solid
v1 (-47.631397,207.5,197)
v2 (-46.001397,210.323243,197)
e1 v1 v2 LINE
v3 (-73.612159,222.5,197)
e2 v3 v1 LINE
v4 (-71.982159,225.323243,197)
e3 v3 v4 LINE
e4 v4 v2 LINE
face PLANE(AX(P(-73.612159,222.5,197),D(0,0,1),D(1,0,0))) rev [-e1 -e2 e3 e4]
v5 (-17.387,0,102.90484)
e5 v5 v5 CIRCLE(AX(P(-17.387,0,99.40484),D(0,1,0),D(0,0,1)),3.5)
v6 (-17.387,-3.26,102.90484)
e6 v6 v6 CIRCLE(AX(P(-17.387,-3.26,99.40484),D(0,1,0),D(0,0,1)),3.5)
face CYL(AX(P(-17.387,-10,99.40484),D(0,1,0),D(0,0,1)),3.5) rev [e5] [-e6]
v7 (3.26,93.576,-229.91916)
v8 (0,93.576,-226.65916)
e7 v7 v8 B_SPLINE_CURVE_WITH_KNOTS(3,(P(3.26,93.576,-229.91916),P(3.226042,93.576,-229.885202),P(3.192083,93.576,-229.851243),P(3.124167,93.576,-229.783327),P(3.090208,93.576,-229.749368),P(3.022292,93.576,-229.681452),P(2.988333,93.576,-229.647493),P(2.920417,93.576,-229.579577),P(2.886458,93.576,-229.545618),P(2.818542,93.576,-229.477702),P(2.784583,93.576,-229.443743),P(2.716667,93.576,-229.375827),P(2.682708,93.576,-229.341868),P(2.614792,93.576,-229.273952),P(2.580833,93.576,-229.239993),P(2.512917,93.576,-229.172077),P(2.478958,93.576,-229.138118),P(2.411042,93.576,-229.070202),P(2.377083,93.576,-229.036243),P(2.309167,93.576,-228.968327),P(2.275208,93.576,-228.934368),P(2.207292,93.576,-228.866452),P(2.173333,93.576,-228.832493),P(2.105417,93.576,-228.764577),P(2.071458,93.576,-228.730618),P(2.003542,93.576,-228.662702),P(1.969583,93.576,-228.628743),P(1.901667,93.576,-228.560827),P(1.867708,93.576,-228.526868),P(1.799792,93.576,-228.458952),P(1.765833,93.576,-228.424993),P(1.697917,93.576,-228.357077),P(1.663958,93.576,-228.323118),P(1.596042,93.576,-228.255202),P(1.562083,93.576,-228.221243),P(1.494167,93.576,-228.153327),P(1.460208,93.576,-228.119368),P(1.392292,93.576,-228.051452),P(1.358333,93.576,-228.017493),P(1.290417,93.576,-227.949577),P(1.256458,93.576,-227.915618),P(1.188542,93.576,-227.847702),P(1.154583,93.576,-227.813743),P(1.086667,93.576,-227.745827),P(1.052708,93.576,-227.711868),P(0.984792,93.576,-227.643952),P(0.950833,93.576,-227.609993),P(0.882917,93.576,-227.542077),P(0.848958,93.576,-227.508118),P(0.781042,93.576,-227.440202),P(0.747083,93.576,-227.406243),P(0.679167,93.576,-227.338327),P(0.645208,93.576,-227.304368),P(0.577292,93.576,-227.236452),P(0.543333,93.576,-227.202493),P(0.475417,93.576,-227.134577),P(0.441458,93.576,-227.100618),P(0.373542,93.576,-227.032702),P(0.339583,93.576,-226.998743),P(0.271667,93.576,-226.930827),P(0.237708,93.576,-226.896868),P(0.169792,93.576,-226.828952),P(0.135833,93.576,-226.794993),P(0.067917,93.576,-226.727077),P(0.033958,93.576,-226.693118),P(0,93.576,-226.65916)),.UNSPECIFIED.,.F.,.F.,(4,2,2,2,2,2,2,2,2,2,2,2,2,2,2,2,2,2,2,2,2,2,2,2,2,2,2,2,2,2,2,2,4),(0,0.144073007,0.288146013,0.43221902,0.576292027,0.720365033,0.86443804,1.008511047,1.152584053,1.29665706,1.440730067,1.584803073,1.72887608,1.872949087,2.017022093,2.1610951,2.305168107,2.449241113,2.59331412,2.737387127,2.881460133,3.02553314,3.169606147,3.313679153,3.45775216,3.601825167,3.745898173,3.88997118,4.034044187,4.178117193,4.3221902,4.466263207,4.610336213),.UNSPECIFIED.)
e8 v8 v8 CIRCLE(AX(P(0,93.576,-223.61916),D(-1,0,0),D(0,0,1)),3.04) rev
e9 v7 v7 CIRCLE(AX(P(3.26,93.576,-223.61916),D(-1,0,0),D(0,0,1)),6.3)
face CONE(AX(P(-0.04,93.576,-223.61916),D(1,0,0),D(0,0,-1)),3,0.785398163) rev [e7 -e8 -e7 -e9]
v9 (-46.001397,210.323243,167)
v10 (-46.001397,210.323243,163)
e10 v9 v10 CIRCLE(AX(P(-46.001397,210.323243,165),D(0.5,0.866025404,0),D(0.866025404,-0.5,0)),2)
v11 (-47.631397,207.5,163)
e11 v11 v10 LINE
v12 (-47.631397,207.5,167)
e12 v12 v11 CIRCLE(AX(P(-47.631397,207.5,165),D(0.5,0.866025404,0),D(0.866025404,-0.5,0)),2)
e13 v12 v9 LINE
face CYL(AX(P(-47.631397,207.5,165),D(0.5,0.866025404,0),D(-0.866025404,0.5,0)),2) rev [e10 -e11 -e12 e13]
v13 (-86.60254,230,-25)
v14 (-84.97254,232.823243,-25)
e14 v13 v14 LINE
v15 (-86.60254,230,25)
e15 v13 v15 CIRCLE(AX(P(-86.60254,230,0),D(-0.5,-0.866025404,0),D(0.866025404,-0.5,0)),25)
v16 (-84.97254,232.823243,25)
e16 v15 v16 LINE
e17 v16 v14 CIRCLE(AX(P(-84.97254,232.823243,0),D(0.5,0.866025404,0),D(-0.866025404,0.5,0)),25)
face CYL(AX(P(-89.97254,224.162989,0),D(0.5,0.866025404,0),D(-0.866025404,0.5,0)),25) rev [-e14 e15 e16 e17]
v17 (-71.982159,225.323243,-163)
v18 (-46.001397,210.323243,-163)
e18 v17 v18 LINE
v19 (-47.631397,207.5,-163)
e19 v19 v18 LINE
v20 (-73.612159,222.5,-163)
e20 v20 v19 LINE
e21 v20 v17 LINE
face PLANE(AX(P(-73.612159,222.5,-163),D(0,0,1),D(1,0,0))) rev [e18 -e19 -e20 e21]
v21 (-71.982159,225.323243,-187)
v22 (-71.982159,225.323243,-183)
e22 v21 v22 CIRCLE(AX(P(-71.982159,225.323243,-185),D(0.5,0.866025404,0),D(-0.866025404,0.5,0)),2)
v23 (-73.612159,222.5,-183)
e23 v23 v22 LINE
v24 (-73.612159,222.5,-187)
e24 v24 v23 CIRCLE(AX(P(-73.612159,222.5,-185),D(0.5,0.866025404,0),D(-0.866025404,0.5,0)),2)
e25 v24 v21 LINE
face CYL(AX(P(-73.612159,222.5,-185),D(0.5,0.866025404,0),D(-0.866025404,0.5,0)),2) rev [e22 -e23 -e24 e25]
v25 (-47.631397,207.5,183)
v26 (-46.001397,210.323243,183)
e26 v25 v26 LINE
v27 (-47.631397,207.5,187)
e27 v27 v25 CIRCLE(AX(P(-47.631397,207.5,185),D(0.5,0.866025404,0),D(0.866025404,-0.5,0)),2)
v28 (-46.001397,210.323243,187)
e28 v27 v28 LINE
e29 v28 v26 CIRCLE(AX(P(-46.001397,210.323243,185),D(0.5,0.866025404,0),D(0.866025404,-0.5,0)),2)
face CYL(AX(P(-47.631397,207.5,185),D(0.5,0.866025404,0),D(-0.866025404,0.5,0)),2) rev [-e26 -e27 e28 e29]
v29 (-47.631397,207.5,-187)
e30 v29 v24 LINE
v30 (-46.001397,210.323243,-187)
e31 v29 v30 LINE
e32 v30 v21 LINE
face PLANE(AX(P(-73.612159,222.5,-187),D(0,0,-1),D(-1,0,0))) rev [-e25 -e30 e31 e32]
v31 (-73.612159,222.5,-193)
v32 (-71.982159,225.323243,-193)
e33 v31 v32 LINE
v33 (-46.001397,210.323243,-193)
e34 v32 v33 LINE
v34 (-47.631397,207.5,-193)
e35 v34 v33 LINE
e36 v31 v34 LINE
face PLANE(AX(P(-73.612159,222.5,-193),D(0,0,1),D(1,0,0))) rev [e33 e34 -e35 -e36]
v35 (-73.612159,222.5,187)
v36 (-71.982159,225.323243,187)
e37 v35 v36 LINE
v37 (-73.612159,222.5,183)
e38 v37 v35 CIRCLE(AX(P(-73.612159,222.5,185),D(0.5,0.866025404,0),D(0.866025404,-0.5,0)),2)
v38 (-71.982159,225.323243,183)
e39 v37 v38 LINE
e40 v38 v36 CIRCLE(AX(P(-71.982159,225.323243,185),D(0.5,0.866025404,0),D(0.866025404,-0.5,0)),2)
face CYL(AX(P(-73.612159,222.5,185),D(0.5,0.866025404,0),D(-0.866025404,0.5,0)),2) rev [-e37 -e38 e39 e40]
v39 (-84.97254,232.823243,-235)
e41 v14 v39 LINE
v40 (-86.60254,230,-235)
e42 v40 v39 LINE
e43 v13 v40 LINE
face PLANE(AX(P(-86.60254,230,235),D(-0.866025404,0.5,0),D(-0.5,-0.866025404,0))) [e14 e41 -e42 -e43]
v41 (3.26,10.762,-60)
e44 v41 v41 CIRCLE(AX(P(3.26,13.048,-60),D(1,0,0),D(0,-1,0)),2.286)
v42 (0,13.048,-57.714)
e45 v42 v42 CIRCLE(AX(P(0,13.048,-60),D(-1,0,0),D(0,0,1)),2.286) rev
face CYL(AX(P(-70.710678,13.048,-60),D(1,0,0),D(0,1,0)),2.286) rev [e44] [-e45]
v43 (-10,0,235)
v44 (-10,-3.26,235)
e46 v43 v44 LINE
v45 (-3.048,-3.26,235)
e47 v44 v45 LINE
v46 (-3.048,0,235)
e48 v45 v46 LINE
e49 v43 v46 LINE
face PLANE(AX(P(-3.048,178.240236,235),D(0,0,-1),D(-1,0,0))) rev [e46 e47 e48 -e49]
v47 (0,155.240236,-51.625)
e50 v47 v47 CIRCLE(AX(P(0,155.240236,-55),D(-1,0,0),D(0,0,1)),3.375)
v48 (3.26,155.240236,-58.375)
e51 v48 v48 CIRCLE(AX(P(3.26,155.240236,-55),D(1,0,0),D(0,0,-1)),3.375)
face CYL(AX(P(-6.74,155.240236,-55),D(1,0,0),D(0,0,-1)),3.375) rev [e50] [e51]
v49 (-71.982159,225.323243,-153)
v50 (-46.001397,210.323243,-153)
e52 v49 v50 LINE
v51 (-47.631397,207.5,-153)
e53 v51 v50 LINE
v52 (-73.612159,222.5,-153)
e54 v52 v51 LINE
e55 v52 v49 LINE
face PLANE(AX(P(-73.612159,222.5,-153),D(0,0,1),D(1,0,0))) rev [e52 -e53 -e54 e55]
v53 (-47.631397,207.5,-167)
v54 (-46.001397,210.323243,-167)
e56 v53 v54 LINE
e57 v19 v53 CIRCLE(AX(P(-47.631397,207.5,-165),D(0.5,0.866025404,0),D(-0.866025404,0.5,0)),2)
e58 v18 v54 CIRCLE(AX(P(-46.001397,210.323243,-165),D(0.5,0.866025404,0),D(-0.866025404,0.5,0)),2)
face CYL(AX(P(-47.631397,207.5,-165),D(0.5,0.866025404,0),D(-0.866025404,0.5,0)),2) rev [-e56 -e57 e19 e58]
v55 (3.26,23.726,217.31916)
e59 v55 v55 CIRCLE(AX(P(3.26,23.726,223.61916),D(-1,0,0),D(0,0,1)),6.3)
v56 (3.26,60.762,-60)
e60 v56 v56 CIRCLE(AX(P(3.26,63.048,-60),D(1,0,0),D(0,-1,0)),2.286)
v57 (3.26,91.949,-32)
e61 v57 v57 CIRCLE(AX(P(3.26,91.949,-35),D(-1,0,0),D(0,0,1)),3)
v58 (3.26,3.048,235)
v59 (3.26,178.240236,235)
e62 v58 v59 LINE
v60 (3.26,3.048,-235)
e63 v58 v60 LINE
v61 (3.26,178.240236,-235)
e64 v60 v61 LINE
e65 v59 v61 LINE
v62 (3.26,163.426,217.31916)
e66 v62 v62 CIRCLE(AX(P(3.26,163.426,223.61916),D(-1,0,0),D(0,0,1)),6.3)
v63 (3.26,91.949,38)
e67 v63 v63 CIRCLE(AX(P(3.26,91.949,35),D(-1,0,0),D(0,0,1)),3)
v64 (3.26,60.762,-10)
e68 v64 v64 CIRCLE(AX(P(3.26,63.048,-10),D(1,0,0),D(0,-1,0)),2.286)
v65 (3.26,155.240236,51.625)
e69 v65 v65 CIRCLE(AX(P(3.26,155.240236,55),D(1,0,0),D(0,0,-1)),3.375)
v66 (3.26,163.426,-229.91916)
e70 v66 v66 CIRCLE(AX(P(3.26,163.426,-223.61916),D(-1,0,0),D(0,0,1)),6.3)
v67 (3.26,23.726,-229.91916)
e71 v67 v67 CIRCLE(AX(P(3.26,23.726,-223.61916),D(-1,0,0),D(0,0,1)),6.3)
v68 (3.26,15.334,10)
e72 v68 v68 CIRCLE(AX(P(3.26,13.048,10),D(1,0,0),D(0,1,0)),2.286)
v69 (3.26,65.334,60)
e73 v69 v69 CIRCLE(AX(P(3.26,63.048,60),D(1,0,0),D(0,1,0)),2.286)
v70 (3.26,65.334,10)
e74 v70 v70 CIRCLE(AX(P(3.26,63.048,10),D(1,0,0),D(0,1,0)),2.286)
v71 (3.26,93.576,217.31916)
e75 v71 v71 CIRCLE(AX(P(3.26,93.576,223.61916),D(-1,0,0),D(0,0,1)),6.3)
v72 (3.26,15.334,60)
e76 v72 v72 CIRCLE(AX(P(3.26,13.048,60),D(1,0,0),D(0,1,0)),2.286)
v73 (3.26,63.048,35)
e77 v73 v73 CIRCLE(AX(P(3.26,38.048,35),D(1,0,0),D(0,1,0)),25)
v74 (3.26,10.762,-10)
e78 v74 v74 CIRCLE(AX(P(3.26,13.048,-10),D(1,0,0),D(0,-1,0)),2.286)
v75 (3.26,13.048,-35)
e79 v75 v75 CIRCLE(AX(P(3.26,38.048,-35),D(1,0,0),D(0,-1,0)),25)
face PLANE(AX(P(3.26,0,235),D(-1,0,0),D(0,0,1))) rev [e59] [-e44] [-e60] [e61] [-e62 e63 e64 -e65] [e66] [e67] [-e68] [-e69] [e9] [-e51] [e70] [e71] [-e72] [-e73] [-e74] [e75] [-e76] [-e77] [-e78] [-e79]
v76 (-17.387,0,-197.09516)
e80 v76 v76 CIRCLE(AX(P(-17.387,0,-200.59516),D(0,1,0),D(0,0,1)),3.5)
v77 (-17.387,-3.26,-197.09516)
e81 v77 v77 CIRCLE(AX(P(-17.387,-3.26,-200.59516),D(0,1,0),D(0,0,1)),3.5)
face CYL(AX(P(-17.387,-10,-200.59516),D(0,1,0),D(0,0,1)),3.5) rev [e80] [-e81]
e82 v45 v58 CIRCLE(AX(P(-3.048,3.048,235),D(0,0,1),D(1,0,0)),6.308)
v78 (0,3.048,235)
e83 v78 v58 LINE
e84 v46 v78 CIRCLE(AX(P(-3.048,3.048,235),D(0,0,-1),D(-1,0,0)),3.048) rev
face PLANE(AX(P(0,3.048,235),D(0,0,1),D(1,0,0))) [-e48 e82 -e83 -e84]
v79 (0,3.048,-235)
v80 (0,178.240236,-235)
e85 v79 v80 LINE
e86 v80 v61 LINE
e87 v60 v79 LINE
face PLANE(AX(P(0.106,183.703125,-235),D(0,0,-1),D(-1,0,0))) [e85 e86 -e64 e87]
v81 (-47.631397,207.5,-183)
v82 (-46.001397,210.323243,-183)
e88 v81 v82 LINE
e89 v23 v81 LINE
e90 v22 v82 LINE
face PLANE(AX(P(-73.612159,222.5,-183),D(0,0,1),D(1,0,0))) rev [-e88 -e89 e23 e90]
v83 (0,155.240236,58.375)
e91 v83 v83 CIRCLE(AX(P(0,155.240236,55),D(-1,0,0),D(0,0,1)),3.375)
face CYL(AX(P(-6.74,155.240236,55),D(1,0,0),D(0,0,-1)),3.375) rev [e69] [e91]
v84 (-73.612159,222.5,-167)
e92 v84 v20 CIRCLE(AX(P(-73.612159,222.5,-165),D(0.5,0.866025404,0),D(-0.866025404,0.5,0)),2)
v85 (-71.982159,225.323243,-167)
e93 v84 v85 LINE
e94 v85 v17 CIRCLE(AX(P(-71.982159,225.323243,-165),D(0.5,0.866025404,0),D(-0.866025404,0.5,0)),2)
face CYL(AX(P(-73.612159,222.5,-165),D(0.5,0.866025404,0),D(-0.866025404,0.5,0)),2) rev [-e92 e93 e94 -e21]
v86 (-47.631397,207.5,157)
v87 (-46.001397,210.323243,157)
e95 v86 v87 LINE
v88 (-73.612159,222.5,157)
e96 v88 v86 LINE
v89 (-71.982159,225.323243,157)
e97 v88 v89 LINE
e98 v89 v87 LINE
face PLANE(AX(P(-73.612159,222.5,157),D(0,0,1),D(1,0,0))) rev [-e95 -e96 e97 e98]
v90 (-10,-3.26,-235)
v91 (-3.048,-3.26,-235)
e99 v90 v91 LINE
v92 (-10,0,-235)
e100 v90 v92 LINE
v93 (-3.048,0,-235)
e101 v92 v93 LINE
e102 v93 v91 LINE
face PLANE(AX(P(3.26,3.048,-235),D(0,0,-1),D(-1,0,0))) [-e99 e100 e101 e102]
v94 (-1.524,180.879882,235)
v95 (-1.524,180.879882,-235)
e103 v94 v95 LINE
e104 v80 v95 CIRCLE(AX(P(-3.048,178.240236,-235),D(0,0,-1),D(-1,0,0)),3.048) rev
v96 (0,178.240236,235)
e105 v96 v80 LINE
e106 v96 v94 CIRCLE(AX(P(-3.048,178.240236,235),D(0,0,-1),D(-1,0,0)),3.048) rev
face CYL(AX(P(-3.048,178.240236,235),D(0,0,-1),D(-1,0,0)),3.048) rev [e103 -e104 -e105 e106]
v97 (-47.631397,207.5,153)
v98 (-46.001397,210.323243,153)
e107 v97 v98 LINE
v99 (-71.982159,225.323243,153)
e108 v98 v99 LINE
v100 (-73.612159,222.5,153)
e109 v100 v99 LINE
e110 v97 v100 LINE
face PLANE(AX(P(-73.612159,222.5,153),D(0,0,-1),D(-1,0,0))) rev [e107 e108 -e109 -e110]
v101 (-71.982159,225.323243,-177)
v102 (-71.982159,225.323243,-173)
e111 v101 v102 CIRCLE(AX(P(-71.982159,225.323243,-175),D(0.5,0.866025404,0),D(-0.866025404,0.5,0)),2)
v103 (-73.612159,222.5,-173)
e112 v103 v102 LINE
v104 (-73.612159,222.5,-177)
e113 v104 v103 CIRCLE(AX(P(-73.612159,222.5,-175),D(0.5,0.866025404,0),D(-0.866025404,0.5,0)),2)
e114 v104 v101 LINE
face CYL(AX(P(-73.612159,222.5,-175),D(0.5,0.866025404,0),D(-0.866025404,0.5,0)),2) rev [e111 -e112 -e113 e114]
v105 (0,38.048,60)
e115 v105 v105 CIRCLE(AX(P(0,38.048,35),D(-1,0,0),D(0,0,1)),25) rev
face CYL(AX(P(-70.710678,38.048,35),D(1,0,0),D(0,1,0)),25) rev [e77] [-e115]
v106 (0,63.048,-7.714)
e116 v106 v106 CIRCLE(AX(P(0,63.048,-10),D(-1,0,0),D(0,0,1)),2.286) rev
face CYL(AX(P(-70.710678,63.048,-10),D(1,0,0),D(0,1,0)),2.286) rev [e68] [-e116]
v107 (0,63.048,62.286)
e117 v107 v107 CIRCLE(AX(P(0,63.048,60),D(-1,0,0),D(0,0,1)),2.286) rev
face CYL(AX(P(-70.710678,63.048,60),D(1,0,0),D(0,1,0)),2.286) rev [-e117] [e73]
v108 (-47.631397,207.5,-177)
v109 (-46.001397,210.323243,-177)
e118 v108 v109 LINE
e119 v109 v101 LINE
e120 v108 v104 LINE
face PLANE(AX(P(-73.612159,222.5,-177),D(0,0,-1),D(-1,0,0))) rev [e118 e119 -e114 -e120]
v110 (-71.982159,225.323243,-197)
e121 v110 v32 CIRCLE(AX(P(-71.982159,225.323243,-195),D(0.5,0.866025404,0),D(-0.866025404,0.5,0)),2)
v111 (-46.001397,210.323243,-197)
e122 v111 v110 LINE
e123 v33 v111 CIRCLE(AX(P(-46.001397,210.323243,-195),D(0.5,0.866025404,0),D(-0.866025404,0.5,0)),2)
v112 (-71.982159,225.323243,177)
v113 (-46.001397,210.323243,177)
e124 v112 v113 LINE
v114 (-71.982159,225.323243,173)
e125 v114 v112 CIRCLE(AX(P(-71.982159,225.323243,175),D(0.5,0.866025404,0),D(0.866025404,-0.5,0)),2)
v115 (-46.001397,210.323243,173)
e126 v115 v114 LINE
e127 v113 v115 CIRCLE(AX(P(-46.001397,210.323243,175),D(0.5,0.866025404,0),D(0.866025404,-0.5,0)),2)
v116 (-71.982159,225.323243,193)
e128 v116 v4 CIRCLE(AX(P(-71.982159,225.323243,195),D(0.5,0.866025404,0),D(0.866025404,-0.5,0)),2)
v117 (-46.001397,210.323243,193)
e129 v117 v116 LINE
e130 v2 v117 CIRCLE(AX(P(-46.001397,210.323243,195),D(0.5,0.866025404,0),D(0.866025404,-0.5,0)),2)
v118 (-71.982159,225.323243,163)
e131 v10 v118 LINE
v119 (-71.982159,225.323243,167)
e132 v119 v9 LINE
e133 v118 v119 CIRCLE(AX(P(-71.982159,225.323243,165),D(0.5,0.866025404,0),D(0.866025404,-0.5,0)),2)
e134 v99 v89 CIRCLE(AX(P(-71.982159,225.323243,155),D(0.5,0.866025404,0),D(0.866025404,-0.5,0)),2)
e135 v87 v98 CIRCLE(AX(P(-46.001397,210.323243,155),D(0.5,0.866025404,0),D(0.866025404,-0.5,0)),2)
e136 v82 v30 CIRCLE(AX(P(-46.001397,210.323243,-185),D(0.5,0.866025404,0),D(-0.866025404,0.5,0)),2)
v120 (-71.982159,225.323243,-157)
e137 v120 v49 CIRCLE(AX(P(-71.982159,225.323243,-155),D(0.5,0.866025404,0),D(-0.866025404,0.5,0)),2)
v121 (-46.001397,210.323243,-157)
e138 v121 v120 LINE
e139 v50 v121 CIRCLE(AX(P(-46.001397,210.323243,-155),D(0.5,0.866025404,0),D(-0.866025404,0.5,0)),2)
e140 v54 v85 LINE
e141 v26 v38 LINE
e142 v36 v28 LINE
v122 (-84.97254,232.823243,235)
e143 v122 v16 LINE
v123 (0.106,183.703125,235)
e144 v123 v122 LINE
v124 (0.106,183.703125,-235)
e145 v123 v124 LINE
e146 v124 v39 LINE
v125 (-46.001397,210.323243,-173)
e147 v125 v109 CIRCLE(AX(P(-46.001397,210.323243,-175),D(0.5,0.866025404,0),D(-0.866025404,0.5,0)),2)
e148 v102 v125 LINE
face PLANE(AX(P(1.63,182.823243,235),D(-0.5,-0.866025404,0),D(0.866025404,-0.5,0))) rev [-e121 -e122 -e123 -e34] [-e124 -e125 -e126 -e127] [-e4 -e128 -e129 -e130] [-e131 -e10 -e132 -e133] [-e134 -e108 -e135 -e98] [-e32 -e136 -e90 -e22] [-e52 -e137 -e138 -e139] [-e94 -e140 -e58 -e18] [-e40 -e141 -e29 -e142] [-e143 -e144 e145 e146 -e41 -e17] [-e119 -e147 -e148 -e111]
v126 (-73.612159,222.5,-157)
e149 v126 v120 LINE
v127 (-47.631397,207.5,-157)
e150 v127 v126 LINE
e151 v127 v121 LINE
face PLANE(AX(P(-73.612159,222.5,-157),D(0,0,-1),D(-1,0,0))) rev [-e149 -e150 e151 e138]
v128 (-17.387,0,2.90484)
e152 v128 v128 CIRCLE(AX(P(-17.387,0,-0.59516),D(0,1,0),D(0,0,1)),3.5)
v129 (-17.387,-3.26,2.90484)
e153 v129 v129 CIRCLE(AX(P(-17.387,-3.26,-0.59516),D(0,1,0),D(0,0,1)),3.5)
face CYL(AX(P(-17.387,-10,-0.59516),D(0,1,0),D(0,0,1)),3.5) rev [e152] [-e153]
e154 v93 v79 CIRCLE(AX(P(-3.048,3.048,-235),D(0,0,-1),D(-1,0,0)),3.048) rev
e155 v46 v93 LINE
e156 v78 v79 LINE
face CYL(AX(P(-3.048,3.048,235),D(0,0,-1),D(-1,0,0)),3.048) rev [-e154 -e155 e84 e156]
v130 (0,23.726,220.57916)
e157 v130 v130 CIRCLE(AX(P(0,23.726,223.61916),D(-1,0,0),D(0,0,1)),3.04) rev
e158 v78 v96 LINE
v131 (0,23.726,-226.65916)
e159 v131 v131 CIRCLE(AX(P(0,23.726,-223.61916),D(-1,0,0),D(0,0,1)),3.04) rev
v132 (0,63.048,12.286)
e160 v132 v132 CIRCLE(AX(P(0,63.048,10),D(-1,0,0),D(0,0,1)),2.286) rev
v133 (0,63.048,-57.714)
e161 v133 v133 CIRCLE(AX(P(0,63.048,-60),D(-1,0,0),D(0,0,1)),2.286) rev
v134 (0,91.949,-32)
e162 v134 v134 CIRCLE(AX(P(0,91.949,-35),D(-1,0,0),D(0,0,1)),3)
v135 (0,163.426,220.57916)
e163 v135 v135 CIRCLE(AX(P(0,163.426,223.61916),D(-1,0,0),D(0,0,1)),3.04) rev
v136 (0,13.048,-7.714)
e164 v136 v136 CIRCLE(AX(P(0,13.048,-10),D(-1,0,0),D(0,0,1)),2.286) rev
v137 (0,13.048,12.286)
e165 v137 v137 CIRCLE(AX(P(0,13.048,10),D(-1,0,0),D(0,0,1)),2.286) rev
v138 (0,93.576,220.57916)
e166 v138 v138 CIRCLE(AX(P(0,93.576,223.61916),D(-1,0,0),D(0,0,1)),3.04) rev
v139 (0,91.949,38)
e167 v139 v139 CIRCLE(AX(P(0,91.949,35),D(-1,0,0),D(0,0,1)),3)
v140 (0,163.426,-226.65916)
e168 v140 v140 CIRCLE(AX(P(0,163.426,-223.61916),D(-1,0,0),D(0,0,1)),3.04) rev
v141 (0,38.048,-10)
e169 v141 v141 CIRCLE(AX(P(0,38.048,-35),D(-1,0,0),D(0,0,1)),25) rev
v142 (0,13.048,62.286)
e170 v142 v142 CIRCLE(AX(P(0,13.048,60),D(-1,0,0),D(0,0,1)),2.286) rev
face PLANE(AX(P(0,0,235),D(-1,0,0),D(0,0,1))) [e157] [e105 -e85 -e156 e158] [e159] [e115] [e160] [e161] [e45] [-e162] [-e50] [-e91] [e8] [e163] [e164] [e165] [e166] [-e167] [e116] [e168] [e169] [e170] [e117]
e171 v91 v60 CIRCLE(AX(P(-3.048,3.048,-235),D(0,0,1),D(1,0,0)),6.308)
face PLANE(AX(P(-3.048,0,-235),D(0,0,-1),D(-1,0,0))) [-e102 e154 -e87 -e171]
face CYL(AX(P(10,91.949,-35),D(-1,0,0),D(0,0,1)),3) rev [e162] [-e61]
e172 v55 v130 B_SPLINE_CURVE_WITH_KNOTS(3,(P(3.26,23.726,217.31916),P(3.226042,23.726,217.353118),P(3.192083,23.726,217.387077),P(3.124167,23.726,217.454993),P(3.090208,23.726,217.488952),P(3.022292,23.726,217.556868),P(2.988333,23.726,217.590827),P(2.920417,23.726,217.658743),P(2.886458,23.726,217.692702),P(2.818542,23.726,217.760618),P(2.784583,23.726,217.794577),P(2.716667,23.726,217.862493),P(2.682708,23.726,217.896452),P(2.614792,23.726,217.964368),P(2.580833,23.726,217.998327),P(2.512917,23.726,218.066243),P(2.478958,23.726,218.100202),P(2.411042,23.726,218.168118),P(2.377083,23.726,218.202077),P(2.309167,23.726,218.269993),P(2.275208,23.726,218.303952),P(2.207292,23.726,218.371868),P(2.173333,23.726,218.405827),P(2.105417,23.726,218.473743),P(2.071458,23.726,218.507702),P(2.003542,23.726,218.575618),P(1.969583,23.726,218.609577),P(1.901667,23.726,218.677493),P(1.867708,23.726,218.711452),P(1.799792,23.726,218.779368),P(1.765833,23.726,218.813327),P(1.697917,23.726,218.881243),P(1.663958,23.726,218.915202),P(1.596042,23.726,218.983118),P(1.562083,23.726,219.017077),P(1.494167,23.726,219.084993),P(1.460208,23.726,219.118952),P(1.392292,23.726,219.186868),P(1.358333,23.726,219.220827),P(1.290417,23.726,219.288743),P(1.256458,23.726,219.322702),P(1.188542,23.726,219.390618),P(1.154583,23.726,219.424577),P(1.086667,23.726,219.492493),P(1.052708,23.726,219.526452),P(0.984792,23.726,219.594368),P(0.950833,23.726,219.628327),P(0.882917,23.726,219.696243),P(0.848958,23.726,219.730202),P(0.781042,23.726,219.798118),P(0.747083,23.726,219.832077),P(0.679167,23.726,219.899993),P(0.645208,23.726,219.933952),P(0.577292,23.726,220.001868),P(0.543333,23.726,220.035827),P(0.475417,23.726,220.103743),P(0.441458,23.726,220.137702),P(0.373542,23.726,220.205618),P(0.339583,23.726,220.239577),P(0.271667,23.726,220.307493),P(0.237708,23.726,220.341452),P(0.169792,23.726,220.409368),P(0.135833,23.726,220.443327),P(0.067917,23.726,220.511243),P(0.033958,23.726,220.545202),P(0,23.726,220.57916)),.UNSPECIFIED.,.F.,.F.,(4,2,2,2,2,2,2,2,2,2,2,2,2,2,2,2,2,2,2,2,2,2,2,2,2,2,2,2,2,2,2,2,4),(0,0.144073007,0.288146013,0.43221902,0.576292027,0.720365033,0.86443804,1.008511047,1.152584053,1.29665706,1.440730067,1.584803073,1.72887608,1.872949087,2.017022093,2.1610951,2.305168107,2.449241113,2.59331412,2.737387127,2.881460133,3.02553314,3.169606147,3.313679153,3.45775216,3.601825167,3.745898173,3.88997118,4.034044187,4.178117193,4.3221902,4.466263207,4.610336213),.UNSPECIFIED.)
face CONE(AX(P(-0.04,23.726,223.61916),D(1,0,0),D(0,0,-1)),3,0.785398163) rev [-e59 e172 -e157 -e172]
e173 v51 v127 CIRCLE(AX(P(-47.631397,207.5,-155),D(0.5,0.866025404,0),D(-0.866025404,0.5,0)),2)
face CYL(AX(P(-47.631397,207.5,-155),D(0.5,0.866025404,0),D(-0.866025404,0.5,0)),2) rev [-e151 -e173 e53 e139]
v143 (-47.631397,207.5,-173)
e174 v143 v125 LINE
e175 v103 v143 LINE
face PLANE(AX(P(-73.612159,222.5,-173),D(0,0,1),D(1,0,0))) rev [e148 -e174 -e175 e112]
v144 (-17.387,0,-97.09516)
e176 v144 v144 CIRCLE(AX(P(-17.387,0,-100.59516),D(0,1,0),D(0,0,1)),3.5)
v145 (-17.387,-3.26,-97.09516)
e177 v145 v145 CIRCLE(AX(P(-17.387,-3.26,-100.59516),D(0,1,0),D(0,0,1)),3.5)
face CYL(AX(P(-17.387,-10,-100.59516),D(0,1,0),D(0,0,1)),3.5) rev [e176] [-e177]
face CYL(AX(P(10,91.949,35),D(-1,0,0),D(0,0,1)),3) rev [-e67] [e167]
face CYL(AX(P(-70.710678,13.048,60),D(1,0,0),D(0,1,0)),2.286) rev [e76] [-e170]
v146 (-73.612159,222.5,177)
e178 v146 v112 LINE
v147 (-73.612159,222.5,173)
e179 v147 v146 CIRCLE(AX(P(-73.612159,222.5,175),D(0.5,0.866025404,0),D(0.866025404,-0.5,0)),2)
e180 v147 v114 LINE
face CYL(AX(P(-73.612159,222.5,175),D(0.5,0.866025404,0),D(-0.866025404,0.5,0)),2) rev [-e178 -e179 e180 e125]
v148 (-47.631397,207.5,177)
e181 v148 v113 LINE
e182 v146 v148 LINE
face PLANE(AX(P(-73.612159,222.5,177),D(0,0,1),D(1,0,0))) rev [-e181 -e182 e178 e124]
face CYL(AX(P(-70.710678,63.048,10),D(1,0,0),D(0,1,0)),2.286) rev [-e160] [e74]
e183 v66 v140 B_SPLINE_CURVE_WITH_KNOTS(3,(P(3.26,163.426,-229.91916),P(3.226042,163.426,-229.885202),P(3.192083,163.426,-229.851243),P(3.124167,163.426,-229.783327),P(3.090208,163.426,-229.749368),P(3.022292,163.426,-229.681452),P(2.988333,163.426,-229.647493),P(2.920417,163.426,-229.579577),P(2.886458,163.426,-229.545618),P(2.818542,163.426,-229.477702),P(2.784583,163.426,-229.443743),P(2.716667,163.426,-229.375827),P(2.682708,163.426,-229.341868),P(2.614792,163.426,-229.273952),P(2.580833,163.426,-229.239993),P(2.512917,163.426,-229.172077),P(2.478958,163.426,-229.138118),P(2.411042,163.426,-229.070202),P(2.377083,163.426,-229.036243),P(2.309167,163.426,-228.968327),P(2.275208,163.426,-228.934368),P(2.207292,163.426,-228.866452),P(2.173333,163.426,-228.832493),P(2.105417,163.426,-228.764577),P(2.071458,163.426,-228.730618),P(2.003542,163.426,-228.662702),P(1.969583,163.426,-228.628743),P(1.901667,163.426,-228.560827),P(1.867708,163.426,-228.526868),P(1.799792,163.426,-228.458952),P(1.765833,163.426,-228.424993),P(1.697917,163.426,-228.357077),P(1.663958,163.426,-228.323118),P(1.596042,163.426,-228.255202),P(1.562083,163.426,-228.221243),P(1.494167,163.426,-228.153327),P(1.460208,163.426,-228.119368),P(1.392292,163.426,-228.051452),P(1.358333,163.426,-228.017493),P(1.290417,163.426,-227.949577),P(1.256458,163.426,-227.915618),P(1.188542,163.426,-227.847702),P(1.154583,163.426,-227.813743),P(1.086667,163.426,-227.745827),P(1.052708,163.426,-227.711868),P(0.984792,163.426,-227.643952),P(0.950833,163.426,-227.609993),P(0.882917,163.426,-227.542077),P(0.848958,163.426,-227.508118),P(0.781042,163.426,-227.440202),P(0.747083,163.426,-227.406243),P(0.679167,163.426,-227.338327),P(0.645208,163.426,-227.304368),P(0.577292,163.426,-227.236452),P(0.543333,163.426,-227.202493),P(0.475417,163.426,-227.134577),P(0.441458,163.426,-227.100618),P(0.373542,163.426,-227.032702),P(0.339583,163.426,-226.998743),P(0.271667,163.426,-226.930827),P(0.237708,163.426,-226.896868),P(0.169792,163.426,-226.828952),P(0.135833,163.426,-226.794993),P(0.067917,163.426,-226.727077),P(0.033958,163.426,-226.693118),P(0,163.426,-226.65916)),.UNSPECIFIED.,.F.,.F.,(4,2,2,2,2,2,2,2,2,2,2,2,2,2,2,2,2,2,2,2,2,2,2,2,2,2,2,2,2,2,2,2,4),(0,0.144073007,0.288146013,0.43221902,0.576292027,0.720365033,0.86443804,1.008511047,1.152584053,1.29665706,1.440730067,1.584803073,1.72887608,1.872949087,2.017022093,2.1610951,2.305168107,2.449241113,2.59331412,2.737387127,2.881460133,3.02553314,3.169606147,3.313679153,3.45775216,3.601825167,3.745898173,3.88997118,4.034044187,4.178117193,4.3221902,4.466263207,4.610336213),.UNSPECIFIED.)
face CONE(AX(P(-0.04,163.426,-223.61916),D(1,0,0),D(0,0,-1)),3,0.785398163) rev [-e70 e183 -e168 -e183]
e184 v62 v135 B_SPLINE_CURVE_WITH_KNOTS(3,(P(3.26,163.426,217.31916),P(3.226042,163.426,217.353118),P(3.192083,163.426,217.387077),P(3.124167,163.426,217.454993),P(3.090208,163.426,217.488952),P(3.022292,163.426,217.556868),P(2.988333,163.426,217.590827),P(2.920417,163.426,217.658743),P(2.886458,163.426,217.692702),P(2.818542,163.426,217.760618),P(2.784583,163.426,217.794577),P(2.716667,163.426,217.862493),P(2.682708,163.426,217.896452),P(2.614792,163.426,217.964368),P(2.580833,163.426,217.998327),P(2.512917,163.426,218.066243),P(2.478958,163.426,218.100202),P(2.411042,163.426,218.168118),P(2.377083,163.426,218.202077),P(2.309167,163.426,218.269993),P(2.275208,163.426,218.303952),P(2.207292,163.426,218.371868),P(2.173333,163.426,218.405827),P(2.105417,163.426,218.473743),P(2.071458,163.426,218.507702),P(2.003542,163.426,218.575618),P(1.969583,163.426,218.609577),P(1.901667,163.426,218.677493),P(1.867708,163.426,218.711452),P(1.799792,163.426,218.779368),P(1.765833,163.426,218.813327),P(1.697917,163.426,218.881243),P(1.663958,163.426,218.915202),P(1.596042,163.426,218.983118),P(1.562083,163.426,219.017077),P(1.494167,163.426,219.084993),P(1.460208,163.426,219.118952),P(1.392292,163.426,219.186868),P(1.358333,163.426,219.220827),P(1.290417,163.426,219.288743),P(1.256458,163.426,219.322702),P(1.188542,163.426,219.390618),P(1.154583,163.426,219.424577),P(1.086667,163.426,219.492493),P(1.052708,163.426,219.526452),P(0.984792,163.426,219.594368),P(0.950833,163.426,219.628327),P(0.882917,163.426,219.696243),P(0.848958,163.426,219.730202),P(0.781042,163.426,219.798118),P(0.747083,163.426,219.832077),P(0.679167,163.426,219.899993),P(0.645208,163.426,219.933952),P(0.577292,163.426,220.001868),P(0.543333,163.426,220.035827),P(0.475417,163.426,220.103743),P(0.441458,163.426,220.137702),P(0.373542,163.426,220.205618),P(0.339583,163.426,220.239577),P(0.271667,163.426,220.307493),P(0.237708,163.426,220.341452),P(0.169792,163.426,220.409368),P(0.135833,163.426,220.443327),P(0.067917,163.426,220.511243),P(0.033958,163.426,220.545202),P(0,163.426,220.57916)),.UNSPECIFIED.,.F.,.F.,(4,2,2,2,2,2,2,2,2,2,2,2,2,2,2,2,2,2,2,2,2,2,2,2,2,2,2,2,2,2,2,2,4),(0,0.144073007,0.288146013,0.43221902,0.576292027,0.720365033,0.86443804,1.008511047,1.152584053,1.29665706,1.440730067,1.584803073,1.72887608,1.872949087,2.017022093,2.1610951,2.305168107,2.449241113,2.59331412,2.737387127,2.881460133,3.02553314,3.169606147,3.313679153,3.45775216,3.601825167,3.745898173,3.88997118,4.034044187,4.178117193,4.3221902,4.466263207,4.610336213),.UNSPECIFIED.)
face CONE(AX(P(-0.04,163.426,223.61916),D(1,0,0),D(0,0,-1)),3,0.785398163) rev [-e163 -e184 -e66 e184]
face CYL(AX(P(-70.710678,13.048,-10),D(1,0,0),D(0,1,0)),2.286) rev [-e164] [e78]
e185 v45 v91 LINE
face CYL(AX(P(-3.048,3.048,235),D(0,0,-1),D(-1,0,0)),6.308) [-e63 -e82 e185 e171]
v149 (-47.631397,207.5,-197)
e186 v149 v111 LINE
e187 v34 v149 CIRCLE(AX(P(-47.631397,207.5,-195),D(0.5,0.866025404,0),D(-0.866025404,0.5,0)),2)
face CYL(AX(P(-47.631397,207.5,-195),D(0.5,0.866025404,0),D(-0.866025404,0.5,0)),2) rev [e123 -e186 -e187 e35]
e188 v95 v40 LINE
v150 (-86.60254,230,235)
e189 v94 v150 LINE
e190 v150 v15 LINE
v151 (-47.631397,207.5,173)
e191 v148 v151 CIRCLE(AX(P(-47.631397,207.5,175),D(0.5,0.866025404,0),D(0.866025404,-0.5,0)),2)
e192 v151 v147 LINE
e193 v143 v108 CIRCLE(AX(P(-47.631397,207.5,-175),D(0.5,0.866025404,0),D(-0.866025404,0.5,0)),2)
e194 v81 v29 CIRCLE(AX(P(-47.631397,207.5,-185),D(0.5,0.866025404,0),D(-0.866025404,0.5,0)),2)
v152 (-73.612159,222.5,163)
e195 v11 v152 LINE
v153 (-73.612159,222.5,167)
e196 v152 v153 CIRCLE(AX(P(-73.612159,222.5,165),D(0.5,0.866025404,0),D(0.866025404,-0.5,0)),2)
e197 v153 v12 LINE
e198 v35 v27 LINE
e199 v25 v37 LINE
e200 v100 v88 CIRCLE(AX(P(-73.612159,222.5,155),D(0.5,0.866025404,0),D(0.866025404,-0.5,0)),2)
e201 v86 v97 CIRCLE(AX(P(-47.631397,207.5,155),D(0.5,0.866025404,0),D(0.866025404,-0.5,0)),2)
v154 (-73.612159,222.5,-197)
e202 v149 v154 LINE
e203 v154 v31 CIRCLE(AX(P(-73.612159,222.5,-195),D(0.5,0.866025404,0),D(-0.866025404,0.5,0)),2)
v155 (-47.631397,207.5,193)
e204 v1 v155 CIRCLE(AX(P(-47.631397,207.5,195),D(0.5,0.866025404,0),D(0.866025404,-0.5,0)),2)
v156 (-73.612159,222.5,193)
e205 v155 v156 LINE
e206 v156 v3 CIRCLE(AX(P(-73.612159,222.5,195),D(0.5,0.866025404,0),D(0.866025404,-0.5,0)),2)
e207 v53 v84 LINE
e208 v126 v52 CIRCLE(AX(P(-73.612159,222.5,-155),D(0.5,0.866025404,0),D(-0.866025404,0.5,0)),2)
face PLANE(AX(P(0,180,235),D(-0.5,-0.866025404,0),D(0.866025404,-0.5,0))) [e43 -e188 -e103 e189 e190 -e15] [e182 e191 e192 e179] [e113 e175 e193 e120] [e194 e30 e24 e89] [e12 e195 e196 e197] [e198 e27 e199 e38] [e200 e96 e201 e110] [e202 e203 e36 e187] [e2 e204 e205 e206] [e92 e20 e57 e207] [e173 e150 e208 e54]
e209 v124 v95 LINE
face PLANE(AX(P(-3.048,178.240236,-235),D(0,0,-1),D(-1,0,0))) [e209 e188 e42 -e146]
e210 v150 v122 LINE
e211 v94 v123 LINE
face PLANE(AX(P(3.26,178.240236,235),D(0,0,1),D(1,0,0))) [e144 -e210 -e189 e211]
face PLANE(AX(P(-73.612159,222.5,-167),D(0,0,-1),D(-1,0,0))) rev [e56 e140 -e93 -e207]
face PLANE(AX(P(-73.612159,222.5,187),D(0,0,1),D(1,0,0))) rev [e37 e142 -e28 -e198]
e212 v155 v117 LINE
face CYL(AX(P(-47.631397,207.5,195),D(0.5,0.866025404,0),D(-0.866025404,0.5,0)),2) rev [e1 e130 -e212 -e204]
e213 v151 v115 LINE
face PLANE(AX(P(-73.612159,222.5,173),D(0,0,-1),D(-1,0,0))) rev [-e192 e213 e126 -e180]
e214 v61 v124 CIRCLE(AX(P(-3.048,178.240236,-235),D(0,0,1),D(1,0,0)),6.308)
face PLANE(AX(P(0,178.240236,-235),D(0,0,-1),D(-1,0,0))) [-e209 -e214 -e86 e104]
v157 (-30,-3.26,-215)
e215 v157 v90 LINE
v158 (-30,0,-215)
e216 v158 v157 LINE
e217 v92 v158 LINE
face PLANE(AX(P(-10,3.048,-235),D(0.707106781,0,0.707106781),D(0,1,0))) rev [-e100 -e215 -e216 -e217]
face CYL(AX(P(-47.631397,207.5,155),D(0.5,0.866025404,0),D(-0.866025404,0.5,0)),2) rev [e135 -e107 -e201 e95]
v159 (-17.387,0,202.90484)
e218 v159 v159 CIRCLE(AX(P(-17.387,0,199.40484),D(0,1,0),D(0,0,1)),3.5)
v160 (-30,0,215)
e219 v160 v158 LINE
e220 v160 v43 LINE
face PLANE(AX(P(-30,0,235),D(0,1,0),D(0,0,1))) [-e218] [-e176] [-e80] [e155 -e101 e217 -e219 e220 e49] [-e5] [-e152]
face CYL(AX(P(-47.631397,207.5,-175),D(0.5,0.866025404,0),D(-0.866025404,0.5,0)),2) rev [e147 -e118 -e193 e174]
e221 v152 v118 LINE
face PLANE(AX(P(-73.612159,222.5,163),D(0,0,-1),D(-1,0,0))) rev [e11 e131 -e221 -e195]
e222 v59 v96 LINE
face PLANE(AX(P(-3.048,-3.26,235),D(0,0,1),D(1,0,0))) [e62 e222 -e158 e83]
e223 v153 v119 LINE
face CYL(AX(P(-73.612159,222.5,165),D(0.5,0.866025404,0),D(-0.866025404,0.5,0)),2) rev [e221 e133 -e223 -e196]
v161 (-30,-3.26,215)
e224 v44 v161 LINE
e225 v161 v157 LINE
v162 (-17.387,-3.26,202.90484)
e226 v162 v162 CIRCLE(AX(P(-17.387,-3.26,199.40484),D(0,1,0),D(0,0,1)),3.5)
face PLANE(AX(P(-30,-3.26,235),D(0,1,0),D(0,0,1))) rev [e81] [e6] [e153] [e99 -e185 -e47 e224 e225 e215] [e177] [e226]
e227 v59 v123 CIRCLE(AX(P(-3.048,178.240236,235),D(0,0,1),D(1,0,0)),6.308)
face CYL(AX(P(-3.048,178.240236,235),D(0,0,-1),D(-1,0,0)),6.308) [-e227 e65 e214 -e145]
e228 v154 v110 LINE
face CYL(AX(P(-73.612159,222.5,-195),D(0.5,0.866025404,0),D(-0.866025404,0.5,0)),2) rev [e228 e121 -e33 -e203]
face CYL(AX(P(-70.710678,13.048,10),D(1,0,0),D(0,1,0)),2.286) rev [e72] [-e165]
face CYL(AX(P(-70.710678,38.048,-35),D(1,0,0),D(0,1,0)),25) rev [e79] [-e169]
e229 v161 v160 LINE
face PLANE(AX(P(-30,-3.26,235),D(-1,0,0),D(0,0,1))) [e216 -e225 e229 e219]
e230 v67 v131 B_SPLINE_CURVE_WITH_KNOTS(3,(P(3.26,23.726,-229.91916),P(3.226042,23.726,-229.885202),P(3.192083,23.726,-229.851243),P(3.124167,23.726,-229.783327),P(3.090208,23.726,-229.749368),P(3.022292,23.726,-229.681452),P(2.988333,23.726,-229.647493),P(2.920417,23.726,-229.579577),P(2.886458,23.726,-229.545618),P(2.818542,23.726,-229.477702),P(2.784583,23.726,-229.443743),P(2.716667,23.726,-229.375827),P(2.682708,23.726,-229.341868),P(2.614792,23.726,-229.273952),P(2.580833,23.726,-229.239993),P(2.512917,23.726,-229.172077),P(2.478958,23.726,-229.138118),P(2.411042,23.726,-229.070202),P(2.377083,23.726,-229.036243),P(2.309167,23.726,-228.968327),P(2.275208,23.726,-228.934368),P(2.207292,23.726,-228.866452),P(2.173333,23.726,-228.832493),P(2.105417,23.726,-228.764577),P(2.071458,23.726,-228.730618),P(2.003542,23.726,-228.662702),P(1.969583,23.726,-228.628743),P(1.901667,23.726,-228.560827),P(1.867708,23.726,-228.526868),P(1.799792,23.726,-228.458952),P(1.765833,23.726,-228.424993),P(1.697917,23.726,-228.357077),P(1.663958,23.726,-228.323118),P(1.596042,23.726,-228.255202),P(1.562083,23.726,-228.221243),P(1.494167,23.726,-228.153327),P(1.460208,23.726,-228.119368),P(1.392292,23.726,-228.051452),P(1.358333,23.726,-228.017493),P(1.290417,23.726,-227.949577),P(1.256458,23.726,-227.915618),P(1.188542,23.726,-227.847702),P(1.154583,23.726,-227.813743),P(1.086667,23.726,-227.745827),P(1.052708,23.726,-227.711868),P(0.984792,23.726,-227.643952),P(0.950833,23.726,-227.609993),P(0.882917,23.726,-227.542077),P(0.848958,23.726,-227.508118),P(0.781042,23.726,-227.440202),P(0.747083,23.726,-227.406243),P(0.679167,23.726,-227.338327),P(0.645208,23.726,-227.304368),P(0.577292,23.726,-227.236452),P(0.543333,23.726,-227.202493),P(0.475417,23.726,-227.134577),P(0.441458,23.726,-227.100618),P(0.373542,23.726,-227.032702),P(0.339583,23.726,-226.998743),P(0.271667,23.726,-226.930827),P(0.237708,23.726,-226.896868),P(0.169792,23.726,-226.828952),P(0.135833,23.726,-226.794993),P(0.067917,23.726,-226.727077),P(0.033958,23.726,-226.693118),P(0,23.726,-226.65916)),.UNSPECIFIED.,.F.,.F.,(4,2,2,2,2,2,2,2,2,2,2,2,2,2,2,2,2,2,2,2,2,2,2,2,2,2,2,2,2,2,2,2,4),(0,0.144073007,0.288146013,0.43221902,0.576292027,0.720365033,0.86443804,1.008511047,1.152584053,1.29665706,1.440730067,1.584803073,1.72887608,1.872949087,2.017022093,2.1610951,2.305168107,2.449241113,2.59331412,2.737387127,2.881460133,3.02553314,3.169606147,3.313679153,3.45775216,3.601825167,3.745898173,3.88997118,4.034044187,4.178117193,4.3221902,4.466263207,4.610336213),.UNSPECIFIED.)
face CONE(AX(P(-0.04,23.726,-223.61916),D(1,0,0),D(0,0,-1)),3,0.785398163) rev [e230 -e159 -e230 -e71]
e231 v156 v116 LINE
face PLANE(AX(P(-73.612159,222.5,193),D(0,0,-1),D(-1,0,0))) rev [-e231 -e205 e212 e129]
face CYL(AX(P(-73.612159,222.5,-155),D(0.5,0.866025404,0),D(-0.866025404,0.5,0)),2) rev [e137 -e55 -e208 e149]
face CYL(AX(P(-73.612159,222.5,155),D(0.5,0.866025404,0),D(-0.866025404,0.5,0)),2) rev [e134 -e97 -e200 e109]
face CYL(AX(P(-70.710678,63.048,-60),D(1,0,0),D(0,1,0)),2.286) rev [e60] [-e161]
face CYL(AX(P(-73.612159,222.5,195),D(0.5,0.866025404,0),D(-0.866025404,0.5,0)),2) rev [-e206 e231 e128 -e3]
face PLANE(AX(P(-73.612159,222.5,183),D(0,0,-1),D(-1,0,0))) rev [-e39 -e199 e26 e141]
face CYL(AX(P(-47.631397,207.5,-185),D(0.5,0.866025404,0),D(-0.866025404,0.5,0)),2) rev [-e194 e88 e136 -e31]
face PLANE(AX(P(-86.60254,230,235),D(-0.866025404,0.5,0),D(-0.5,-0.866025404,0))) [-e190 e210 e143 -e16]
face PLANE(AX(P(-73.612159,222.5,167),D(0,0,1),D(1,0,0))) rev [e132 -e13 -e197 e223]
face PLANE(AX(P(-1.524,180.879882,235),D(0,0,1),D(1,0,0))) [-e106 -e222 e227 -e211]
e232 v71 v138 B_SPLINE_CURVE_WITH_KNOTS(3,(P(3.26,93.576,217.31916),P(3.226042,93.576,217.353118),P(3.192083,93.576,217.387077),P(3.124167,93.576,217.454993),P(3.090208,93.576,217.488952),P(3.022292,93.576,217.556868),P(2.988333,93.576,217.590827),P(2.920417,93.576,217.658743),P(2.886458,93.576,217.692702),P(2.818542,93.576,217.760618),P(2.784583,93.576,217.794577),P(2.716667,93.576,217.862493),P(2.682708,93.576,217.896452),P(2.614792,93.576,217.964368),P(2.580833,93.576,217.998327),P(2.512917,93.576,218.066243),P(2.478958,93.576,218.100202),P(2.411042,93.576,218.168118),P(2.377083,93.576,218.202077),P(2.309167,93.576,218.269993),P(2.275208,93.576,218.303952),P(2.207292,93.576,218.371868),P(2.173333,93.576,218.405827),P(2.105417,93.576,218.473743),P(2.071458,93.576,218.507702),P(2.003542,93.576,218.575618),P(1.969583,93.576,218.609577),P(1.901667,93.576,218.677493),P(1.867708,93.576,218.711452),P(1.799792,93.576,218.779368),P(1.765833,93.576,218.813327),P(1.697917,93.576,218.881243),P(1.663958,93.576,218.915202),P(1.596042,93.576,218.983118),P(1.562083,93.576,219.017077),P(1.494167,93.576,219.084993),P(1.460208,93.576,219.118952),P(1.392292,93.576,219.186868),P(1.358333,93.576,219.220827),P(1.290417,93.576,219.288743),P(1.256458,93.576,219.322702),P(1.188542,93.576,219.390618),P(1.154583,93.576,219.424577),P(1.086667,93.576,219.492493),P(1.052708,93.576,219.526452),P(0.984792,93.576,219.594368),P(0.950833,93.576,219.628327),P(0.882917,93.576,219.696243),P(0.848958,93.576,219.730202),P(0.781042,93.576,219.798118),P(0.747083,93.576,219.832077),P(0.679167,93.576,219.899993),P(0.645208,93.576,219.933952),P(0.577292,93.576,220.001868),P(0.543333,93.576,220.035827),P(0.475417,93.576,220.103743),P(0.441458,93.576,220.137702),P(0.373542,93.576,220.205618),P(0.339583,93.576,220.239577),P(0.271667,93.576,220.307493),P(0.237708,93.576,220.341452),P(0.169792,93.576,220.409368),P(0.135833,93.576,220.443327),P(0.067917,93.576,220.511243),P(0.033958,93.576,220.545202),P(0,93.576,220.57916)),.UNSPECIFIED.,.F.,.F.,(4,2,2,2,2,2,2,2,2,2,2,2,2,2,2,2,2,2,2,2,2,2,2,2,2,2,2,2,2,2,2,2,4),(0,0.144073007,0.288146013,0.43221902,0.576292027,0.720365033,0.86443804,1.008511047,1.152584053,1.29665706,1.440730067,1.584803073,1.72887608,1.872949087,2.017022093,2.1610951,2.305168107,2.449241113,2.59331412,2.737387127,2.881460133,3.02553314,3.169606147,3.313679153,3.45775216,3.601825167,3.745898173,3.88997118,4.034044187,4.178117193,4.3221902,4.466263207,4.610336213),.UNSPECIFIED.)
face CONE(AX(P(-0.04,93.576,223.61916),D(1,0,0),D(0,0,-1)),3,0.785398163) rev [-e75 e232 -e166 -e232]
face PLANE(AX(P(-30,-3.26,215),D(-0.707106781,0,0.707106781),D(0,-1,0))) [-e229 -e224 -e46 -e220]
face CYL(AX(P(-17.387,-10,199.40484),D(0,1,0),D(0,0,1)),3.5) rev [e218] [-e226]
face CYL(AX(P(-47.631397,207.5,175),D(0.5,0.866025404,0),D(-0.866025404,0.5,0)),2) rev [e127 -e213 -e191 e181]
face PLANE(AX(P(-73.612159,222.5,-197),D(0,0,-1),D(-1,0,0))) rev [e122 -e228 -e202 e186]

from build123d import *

# Parameters (mm, degrees)
BASE_FLANGE1_DEPTH = 235
SKETCH6_R          = 3.5
CUT_EXTRUDE1_DEPTH = 10
CHAMFER1_SIZE      = 20
SKETCH8_R          = 3
CUT_EXTRUDE3_DEPTH = 3.26
SKETCH11_R         = 2.286
SKETCH11_R_2       = 25
CUT_EXTRUDE5_DEPTH = 3.26
SKETCH12_R         = 3
CUT_EXTRUDE6_DEPTH = 10
CUT_EXTRUDE7_DEPTH = 10
CUT_EXTRUDE8_DEPTH = 10
CHAMFER2_SIZE      = 3.3
SKETCH15_R         = 3.375
CUT_EXTRUDE9_DEPTH = 10


# Sheet-metal steps are written as plain solids
with BuildPart() as part:
    # Sketch1 → Base-Flange1 (new, symmetric)
    with BuildSketch(Plane.XY):
        with BuildLine():
            Line((-30, 0), (-3.048, 0))
            ThreePointArc((-3.048, 0), (-0.892738531, 0.892738531), (0, 3.048))
            Line((0, 3.048), (0, 178.24023638))
            ThreePointArc((0, 178.24023638), (-0.408354569, 179.76423638), (-1.524, 180.87988181))
            Line((-1.524, 180.87988181), (-86.602540378, 230))
            Line((-86.602540378, 230), (-84.972540378, 232.823242816))
            Line((-84.972540378, 232.823242816), (0.106, 183.703124627))
            ThreePointArc((0.106, 183.703124627), (2.414888247, 181.39423638), (3.26, 178.24023638))
            Line((3.26, 178.24023638), (3.26, 3.048))
            ThreePointArc((3.26, 3.048), (1.412429576, -1.412429576), (-3.048, -3.26))
            Line((-3.048, -3.26), (-30, -3.26))
            Line((-30, -3.26), (-30, 0))
        make_face()
    extrude(amount=BASE_FLANGE1_DEPTH, both=True)

    # Sketch6 → Cut-Extrude1 (cut)
    with BuildSketch(Plane(origin=(0, 0, 0), x_dir=(1, 0, 0), z_dir=(0, 1, 0))):
        with Locations(Location((-17.387, 0.59516, 0), (0, 0, 270))):
            Circle(SKETCH6_R)
        with Locations(Location((-17.387, -199.40484, 0), (0, 0, 270))):
            Circle(SKETCH6_R)
        with Locations(Location((-17.387, -99.40484, 0), (0, 0, 270))):
            Circle(SKETCH6_R)
        with Locations(Location((-17.387, 200.59516, 0), (0, 0, 270))):
            Circle(SKETCH6_R)
        with Locations(Location((-17.387, 100.59516, 0), (0, 0, 270))):
            Circle(SKETCH6_R)
    extrude(amount=-CUT_EXTRUDE1_DEPTH, mode=Mode.SUBTRACT)

    # Chamfer1
    chamfer1_edges = [part.edges().sort_by_distance(p)[0] for p in [
        (-30, -1.63, -235),
        (-30, -1.63, 235),
    ]]
    chamfer(chamfer1_edges, length=CHAMFER1_SIZE)

    # Sketch8 → Cut-Extrude3 (cut)
    with BuildSketch(Plane(origin=(3.26, 0, 0), x_dir=(0, 0, -1), z_dir=(1, 0, 0))):
        with Locations((-223.61916, 163.426)):
            Circle(SKETCH8_R)
        with Locations((-223.61916, 93.576)):
            Circle(SKETCH8_R)
        with Locations((-223.61916, 23.726)):
            Circle(SKETCH8_R)
        with Locations(Location((223.61916, 23.726, 0), (0, 0, 180))):
            Circle(SKETCH8_R)
        with Locations(Location((223.61916, 93.576, 0), (0, 0, 180))):
            Circle(SKETCH8_R)
        with Locations(Location((223.61916, 163.426, 0), (0, 0, 180))):
            Circle(SKETCH8_R)
    extrude(amount=-CUT_EXTRUDE3_DEPTH, mode=Mode.SUBTRACT)

    # Sketch11 → Cut-Extrude5 (cut)
    with BuildSketch(Plane(origin=(3.26, 0, 0), x_dir=(0, 0, -1), z_dir=(1, 0, 0))):
        with Locations(Location((-60, 63.048, 0), (0, 0, 90))):
            Circle(SKETCH11_R)
        with Locations(Location((-10, 63.048, 0), (0, 0, 90))):
            Circle(SKETCH11_R)
        with Locations(Location((-10, 13.048, 0), (0, 0, 90))):
            Circle(SKETCH11_R)
        with Locations(Location((-60, 13.048, 0), (0, 0, 90))):
            Circle(SKETCH11_R)
        with Locations(Location((-35, 38.048, 0), (0, 0, 90))):
            Circle(SKETCH11_R_2)
        with Locations(Location((35, 38.048, 0), (0, 0, 180))):
            Circle(SKETCH11_R_2)
        with Locations(Location((60, 13.048, 0), (0, 0, 180))):
            Circle(SKETCH11_R)
        with Locations(Location((10, 13.048, 0), (0, 0, 180))):
            Circle(SKETCH11_R)
        with Locations(Location((10, 63.048, 0), (0, 0, 180))):
            Circle(SKETCH11_R)
        with Locations(Location((60, 63.048, 0), (0, 0, 180))):
            Circle(SKETCH11_R)
    extrude(amount=-CUT_EXTRUDE5_DEPTH, mode=Mode.SUBTRACT)

    # Sketch12 → Cut-Extrude6 (cut)
    with BuildSketch(Plane.ZY):
        with Locations((35, 91.949)):
            Circle(SKETCH12_R)
        with Locations((-35, 91.949)):
            Circle(SKETCH12_R)
    extrude(amount=-CUT_EXTRUDE6_DEPTH, mode=Mode.SUBTRACT)

    # Sketch13 → Cut-Extrude7 (cut)
    with BuildSketch(Plane(origin=(79.572286341, 137.823242816, 0), x_dir=(0.8660254037844399, -0.4999999999999977, 0), z_dir=(0.4999999999999977, 0.8660254037844399, 0))):
        with BuildLine():
            Line((-175, 197), (-145, 197))
            ThreePointArc((-145, 197), (-143, 195), (-145, 193))
            Line((-145, 193), (-175, 193))
            ThreePointArc((-175, 193), (-177, 195), (-175, 197))
        make_face()
        with BuildLine():
            Line((-175, 187), (-145, 187))
            ThreePointArc((-145, 187), (-143, 185), (-145, 183))
            Line((-145, 183), (-175, 183))
            ThreePointArc((-175, 183), (-177, 185), (-175, 187))
        make_face()
        with BuildLine():
            Line((-175, 177), (-145, 177))
            ThreePointArc((-145, 177), (-143, 175), (-145, 173))
            Line((-145, 173), (-175, 173))
            ThreePointArc((-175, 173), (-177, 175), (-175, 177))
        make_face()
        with BuildLine():
            Line((-175, 167), (-145, 167))
            ThreePointArc((-145, 167), (-143, 165), (-145, 163))
            Line((-145, 163), (-175, 163))
            ThreePointArc((-175, 163), (-177, 165), (-175, 167))
        make_face()
        with BuildLine():
            Line((-175, 157), (-145, 157))
            ThreePointArc((-145, 157), (-143, 155), (-145, 153))
            Line((-145, 153), (-175, 153))
            ThreePointArc((-175, 153), (-177, 155), (-175, 157))
        make_face()
        with BuildLine():
            Line((-175, -197), (-145, -197))
            ThreePointArc((-145, -197), (-143, -195), (-145, -193))
            Line((-145, -193), (-175, -193))
            ThreePointArc((-175, -193), (-177, -195), (-175, -197))
        make_face()
        with BuildLine():
            Line((-175, -187), (-145, -187))
            ThreePointArc((-145, -187), (-143, -185), (-145, -183))
            Line((-145, -183), (-175, -183))
            ThreePointArc((-175, -183), (-177, -185), (-175, -187))
        make_face()
        with BuildLine():
            Line((-175, -177), (-145, -177))
            ThreePointArc((-145, -177), (-143, -175), (-145, -173))
            Line((-145, -173), (-175, -173))
            ThreePointArc((-175, -173), (-177, -175), (-175, -177))
        make_face()
        with BuildLine():
            Line((-175, -167), (-145, -167))
            ThreePointArc((-145, -167), (-143, -165), (-145, -163))
            Line((-145, -163), (-175, -163))
            ThreePointArc((-175, -163), (-177, -165), (-175, -167))
        make_face()
        with BuildLine():
            Line((-175, -157), (-145, -157))
            ThreePointArc((-145, -157), (-143, -155), (-145, -153))
            Line((-145, -153), (-175, -153))
            ThreePointArc((-175, -153), (-177, -155), (-175, -157))
        make_face()
    extrude(amount=-CUT_EXTRUDE7_DEPTH, mode=Mode.SUBTRACT)

    # Sketch14 → Cut-Extrude8 (cut)
    with BuildSketch(Plane(origin=(79.572286341, 137.823242816, 0), x_dir=(0.8660254037844399, -0.4999999999999977, 0), z_dir=(0.4999999999999977, 0.8660254037844399, 0))):
        with BuildLine():
            Line((-190, 25), (-190, -25))
            ThreePointArc((-190, -25), (-165, 0), (-190, 25))
        make_face()
    extrude(amount=-CUT_EXTRUDE8_DEPTH, mode=Mode.SUBTRACT)

    # Chamfer2
    # the kernel refuses this chamfer: 3.3 mm, written as the material it takes off along each edge
    with BuildSketch(Plane(origin=(3.26, 163.426, -223.61916), x_dir=(0, 0, 1), z_dir=(0, 1, 0))) as chamfer2_piece_1:
        Polygon((3 + CHAMFER2_SIZE, 0), (3, -CHAMFER2_SIZE), (3, 0), align=None)
    revolve(axis=Axis((3.26, 163.426, -223.61916), (1, 0, 0)), mode=Mode.SUBTRACT)
    with BuildSketch(Plane(origin=(3.26, 93.576, -223.61916), x_dir=(0, 0, 1), z_dir=(0, 1, 0))) as chamfer2_piece_2:
        Polygon((3 + CHAMFER2_SIZE, 0), (3, -CHAMFER2_SIZE), (3, 0), align=None)
    revolve(axis=Axis((3.26, 93.576, -223.61916), (1, 0, 0)), mode=Mode.SUBTRACT)
    with BuildSketch(Plane(origin=(3.26, 23.726, -223.61916), x_dir=(0, 0, 1), z_dir=(0, 1, 0))) as chamfer2_piece_3:
        Polygon((3 + CHAMFER2_SIZE, 0), (3, -CHAMFER2_SIZE), (3, 0), align=None)
    revolve(axis=Axis((3.26, 23.726, -223.61916), (1, 0, 0)), mode=Mode.SUBTRACT)
    with BuildSketch(Plane(origin=(3.26, 23.726, 223.61916), x_dir=(0, 0, -1), z_dir=(0, -1, 0))) as chamfer2_piece_4:
        Polygon((3 + CHAMFER2_SIZE, 0), (3, -CHAMFER2_SIZE), (3, 0), align=None)
    revolve(axis=Axis((3.26, 23.726, 223.61916), (1, 0, 0)), mode=Mode.SUBTRACT)
    with BuildSketch(Plane(origin=(3.26, 93.576, 223.61916), x_dir=(0, 0, -1), z_dir=(0, -1, 0))) as chamfer2_piece_5:
        Polygon((3 + CHAMFER2_SIZE, 0), (3, -CHAMFER2_SIZE), (3, 0), align=None)
    revolve(axis=Axis((3.26, 93.576, 223.61916), (1, 0, 0)), mode=Mode.SUBTRACT)
    with BuildSketch(Plane(origin=(3.26, 163.426, 223.61916), x_dir=(0, 0, -1), z_dir=(0, -1, 0))) as chamfer2_piece_6:
        Polygon((3 + CHAMFER2_SIZE, 0), (3, -CHAMFER2_SIZE), (3, 0), align=None)
    revolve(axis=Axis((3.26, 163.426, 223.61916), (1, 0, 0)), mode=Mode.SUBTRACT)

    # Sketch15 → Cut-Extrude9 (cut)
    with BuildSketch(Plane(origin=(3.26, 0, 0), x_dir=(0, 0, -1), z_dir=(1, 0, 0))):
        with Locations((-55, 155.24023638)):
            Circle(SKETCH15_R)
        with Locations((55, 155.24023638)):
            Circle(SKETCH15_R)
    extrude(amount=-CUT_EXTRUDE9_DEPTH, mode=Mode.SUBTRACT)


solid = part.part
